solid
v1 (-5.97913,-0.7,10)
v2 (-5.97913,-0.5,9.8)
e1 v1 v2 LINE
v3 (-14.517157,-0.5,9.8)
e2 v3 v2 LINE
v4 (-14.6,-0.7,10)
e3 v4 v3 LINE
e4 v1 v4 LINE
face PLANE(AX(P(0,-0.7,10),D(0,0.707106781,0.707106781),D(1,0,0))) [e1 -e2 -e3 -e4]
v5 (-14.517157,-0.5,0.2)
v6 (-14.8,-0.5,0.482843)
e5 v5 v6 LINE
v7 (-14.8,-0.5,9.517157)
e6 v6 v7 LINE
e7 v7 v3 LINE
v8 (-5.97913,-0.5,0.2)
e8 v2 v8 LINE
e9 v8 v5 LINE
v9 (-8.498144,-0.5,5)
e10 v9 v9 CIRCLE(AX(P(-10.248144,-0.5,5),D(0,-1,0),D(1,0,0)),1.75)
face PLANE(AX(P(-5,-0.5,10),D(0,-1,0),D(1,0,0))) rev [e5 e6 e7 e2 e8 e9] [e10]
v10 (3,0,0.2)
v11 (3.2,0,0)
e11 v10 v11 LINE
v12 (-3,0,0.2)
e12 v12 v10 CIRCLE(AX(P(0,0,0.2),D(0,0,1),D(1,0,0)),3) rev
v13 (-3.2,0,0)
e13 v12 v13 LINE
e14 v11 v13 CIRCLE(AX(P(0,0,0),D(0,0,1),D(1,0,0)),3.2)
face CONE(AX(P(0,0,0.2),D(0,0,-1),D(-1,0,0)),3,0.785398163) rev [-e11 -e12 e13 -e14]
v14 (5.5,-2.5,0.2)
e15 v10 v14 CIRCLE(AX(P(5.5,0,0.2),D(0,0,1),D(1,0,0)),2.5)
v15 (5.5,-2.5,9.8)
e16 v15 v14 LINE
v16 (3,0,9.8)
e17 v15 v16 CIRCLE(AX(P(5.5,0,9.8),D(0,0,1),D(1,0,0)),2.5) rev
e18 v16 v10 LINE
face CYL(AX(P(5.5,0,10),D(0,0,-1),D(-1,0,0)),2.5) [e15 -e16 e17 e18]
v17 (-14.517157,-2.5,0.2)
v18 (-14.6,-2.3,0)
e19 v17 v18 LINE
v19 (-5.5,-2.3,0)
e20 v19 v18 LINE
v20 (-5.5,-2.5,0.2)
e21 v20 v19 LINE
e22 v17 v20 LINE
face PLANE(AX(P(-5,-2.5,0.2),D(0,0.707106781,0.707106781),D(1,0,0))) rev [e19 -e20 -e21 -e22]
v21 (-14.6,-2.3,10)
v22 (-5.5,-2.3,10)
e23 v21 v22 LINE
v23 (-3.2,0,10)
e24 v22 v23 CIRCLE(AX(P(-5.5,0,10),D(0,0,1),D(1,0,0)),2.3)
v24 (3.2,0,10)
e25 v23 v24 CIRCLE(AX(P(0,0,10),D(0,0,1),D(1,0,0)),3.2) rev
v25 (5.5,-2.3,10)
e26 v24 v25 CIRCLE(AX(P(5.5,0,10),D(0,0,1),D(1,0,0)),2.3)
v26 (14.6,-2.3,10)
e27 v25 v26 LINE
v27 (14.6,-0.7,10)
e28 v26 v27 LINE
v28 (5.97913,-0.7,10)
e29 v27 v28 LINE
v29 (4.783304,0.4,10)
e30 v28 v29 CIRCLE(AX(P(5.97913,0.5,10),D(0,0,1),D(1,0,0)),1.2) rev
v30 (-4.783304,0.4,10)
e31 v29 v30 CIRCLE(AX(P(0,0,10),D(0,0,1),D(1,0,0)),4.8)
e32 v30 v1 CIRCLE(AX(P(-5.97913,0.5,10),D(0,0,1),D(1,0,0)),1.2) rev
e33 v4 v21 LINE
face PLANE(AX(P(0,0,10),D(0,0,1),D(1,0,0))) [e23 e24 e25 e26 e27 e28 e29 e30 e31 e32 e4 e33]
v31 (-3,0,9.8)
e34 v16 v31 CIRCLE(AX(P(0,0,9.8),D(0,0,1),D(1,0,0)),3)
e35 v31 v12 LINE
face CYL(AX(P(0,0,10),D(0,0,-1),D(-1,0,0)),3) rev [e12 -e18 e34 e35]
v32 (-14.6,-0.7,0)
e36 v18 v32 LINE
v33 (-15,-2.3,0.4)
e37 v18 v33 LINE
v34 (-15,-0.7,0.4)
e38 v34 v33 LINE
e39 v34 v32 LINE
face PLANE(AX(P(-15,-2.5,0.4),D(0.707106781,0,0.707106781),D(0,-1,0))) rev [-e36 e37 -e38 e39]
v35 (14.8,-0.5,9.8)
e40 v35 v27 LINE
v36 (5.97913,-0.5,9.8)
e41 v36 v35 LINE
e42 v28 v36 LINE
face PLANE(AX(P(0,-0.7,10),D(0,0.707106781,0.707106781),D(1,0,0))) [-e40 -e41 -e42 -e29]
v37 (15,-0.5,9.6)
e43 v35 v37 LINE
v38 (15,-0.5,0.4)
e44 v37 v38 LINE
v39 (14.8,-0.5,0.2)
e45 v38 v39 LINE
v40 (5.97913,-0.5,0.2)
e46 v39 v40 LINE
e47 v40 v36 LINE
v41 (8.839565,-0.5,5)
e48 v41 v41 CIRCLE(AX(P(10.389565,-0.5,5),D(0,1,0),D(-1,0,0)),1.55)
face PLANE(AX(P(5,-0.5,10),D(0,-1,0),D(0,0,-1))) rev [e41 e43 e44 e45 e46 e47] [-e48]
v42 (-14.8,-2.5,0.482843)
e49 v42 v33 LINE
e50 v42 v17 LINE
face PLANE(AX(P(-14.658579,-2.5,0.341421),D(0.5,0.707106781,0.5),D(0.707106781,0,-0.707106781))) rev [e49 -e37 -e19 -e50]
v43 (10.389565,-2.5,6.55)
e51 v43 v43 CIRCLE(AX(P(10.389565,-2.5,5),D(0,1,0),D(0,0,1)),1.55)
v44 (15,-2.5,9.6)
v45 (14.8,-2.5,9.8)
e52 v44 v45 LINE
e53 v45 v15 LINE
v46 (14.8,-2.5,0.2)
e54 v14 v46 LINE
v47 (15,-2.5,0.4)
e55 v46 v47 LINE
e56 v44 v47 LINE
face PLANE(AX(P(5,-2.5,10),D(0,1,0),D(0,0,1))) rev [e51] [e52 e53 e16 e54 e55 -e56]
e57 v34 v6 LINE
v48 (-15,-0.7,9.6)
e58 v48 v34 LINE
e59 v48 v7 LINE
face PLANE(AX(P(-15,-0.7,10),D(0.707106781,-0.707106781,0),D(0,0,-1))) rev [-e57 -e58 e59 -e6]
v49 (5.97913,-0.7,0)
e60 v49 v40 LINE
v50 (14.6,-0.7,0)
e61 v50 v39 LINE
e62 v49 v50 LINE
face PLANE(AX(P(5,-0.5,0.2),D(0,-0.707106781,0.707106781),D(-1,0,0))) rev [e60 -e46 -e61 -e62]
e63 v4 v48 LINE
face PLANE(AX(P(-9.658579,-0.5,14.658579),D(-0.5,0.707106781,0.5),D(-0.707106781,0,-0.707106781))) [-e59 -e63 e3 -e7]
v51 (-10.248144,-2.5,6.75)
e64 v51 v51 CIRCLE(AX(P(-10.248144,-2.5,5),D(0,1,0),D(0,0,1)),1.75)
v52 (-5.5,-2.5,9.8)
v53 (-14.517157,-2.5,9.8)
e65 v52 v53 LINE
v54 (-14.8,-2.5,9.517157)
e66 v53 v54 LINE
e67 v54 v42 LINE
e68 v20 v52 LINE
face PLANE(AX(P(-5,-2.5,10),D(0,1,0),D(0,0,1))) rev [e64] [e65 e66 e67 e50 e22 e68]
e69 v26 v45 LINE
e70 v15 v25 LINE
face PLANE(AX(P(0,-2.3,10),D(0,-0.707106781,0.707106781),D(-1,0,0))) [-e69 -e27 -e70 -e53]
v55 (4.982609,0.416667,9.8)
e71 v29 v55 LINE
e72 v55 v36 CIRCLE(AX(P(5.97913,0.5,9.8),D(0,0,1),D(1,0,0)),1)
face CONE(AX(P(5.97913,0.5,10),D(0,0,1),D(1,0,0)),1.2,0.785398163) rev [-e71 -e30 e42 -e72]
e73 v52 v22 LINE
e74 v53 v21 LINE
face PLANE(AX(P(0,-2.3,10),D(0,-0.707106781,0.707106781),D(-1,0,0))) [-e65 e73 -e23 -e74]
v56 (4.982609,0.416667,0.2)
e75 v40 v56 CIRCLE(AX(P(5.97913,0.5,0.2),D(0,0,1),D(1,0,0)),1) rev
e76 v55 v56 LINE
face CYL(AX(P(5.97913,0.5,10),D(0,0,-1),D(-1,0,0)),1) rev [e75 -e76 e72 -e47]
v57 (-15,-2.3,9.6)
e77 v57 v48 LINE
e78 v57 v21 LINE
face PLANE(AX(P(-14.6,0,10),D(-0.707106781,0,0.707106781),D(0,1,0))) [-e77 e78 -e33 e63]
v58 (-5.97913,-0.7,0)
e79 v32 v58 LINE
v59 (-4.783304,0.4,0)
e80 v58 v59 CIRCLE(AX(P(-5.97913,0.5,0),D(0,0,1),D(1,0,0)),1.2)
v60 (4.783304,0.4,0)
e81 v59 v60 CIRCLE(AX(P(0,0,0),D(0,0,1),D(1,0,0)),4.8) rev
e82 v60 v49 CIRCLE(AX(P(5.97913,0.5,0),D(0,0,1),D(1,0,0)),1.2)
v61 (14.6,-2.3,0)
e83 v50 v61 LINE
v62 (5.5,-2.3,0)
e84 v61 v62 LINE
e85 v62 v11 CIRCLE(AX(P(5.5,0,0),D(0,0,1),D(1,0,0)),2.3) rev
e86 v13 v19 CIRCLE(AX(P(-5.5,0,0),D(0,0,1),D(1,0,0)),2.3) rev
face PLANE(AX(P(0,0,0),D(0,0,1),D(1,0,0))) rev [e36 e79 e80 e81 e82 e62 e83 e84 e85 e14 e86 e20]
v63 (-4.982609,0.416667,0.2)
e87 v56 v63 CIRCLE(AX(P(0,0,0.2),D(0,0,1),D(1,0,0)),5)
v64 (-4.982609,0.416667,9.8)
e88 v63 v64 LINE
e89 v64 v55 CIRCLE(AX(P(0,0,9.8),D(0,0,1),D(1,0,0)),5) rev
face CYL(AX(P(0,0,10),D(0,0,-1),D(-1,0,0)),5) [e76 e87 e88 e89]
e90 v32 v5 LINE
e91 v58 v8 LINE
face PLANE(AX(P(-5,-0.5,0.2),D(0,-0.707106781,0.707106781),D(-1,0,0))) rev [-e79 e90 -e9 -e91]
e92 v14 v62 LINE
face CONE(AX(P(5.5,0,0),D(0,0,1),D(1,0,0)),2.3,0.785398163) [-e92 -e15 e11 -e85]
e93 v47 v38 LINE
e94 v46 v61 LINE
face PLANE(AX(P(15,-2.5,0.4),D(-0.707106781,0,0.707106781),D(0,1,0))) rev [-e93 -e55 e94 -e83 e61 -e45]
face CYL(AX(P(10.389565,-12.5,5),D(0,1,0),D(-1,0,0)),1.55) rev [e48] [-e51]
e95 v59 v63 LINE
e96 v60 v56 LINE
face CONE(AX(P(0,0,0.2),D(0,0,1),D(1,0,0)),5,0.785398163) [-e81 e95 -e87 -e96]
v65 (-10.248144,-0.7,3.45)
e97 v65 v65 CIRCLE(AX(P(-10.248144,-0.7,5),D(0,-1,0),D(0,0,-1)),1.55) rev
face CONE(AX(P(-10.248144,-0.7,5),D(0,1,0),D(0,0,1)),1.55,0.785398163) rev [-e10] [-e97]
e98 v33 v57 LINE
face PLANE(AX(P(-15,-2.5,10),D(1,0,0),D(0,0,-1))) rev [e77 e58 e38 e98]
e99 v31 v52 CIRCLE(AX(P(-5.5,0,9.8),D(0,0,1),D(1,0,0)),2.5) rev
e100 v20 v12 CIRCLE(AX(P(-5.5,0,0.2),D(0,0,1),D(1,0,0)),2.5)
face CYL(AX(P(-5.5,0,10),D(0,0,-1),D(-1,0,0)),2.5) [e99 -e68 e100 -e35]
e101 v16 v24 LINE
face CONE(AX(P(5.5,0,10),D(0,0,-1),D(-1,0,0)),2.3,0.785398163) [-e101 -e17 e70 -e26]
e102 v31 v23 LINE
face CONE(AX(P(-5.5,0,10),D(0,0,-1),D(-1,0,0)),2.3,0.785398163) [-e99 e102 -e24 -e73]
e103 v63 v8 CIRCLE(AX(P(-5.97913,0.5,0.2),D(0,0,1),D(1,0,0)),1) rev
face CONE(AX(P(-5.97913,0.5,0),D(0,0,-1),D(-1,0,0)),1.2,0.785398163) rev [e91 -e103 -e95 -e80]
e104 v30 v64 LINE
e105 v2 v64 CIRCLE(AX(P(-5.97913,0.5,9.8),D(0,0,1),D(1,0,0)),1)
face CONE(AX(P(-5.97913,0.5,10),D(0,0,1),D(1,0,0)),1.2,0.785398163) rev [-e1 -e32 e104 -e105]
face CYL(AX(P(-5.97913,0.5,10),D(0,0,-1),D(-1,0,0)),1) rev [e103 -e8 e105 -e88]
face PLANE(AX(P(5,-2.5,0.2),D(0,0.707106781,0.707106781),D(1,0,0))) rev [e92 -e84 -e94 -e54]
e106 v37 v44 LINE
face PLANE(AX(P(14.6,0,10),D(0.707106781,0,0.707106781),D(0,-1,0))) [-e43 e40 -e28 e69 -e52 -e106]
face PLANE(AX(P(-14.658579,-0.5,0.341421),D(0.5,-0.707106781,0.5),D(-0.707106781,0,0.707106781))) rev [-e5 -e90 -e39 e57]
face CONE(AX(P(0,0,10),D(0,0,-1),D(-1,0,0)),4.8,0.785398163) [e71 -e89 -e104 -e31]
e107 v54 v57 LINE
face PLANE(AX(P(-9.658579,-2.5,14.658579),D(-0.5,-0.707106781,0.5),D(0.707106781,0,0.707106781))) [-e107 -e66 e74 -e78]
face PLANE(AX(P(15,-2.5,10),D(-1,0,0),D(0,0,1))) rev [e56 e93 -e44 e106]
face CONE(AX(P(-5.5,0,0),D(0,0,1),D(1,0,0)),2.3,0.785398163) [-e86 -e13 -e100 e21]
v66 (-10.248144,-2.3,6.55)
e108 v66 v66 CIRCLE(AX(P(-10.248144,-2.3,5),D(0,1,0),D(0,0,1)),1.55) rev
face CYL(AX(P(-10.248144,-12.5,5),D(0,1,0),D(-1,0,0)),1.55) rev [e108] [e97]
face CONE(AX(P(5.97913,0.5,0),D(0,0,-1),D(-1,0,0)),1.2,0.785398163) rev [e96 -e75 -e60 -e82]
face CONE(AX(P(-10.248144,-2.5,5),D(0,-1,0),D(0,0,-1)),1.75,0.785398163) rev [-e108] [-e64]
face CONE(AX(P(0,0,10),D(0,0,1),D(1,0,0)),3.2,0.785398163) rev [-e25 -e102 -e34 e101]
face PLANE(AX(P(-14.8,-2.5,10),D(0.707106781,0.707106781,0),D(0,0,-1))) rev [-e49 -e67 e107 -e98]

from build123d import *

# Parameters (mm, degrees)
EXTRUDE_3_DEPTH     = 10
FILLET_2_R          = 1
FILLET_3_R          = 2.5
CHAMFER_1_SIZE      = 0.4
SKETCH_5_R          = 1.55
CUT_EXTRUDE_2_DEPTH = 12
CHAMFER_2_SIZE      = 0.2


with BuildPart() as part:
    # 草图4 → 凸台-拉伸3 (new body)
    with BuildSketch(Plane.XY):
        with BuildLine():
            Line((-5, 0), (-5, -0.5))
            Line((-5, -0.5), (-15, -0.5))
            Line((-15, -0.5), (-15, -2.5))
            Line((-15, -2.5), (-5, -2.5))
            Line((-5, -2.5), (-3, -2.5))
            Line((-3, -2.5), (-3, 0))
            ThreePointArc((-3, 0), (0, 3), (3, 0))
            Line((3, 0), (3, -2.5))
            Line((3, -2.5), (5, -2.5))
            Line((5, -2.5), (15, -2.5))
            Line((15, -2.5), (15, -0.5))
            Line((15, -0.5), (5, -0.5))
            Line((5, -0.5), (5, 0))
            ThreePointArc((5, 0), (0, 5), (-5, 0))
        make_face()
    extrude(amount=EXTRUDE_3_DEPTH)

    # 圆角2
    fillet_2_edges = [part.edges().sort_by_distance(p)[0] for p in [
        (5, -0.5, 5),
        (-5, -0.5, 5),
    ]]
    fillet(fillet_2_edges, radius=FILLET_2_R)

    # 圆角3
    fillet_3_edges = [part.edges().sort_by_distance(p)[0] for p in [
        (-3, -2.5, 5),
        (3, -2.5, 5),
    ]]
    fillet(fillet_3_edges, radius=FILLET_3_R - 0.0001)  # a hair under: the kernel refuses the full size

    # 倒角1
    chamfer_1_edges = [part.edges().sort_by_distance(p)[0] for p in [
        (-15, -1.5, 0),
        (15, -1.5, 0),
        (15, -1.5, 10),
        (-15, -1.5, 10),
    ]]
    chamfer(chamfer_1_edges, length=CHAMFER_1_SIZE)

    # 草图5 → 切除-拉伸2 (cut)
    with BuildSketch(Plane(origin=(0, -0.5, 0), x_dir=(1, 0, 0), z_dir=(0, 1, 0))):
        with Locations(Location((-10.24814383, -5, 0), (0, 0, 180))):
            Circle(SKETCH_5_R)
        with Locations(Location((10.389565186, -5, 0), (0, 0, 180))):
            Circle(SKETCH_5_R)
    extrude(amount=-CUT_EXTRUDE_2_DEPTH, mode=Mode.SUBTRACT)

    # 倒角2
    chamfer_2_edges = [part.edges().sort_by_distance(p)[0] for p in [
        (0, 3, 0),
        (0, 5, 0),
        (0, 5, 10),
        (-10.289565186, -0.5, 0),
        (-10.289565186, -0.5, 10),
        (5.302127171, -0.235980072, 0),
        (5.302127171, -0.235980072, 10),
        (-5.302127171, -0.235980072, 0),
        (-5.302127171, -0.235980072, 10),
        (10.04995, -2.5, 0),
        (3.732203758, -1.767796242, 0),
        (-3.732203758, -1.767796242, 0),
        (10.04995, -2.5, 10),
        (3.732203758, -1.767796242, 10),
        (-3.732203758, -1.767796242, 10),
        (-10.04995, -2.5, 10),
        (10.289565186, -0.5, 10),
        (10.289565186, -0.5, 0),
        (-10.04995, -2.5, 0),
        (-15, -2.5, 5),
        (-14.8, -2.5, 0.2),
        (-14.8, -2.5, 9.8),
        (-15, -0.5, 5),
        (-14.8, -0.5, 0.2),
        (-14.8, -0.5, 9.8),
        (0, 3, 10),
        (-8.69814383, -2.5, 5),
        (-8.69814383, -0.5, 5),
    ]]
    chamfer(chamfer_2_edges, length=CHAMFER_2_SIZE)


solid = part.part
